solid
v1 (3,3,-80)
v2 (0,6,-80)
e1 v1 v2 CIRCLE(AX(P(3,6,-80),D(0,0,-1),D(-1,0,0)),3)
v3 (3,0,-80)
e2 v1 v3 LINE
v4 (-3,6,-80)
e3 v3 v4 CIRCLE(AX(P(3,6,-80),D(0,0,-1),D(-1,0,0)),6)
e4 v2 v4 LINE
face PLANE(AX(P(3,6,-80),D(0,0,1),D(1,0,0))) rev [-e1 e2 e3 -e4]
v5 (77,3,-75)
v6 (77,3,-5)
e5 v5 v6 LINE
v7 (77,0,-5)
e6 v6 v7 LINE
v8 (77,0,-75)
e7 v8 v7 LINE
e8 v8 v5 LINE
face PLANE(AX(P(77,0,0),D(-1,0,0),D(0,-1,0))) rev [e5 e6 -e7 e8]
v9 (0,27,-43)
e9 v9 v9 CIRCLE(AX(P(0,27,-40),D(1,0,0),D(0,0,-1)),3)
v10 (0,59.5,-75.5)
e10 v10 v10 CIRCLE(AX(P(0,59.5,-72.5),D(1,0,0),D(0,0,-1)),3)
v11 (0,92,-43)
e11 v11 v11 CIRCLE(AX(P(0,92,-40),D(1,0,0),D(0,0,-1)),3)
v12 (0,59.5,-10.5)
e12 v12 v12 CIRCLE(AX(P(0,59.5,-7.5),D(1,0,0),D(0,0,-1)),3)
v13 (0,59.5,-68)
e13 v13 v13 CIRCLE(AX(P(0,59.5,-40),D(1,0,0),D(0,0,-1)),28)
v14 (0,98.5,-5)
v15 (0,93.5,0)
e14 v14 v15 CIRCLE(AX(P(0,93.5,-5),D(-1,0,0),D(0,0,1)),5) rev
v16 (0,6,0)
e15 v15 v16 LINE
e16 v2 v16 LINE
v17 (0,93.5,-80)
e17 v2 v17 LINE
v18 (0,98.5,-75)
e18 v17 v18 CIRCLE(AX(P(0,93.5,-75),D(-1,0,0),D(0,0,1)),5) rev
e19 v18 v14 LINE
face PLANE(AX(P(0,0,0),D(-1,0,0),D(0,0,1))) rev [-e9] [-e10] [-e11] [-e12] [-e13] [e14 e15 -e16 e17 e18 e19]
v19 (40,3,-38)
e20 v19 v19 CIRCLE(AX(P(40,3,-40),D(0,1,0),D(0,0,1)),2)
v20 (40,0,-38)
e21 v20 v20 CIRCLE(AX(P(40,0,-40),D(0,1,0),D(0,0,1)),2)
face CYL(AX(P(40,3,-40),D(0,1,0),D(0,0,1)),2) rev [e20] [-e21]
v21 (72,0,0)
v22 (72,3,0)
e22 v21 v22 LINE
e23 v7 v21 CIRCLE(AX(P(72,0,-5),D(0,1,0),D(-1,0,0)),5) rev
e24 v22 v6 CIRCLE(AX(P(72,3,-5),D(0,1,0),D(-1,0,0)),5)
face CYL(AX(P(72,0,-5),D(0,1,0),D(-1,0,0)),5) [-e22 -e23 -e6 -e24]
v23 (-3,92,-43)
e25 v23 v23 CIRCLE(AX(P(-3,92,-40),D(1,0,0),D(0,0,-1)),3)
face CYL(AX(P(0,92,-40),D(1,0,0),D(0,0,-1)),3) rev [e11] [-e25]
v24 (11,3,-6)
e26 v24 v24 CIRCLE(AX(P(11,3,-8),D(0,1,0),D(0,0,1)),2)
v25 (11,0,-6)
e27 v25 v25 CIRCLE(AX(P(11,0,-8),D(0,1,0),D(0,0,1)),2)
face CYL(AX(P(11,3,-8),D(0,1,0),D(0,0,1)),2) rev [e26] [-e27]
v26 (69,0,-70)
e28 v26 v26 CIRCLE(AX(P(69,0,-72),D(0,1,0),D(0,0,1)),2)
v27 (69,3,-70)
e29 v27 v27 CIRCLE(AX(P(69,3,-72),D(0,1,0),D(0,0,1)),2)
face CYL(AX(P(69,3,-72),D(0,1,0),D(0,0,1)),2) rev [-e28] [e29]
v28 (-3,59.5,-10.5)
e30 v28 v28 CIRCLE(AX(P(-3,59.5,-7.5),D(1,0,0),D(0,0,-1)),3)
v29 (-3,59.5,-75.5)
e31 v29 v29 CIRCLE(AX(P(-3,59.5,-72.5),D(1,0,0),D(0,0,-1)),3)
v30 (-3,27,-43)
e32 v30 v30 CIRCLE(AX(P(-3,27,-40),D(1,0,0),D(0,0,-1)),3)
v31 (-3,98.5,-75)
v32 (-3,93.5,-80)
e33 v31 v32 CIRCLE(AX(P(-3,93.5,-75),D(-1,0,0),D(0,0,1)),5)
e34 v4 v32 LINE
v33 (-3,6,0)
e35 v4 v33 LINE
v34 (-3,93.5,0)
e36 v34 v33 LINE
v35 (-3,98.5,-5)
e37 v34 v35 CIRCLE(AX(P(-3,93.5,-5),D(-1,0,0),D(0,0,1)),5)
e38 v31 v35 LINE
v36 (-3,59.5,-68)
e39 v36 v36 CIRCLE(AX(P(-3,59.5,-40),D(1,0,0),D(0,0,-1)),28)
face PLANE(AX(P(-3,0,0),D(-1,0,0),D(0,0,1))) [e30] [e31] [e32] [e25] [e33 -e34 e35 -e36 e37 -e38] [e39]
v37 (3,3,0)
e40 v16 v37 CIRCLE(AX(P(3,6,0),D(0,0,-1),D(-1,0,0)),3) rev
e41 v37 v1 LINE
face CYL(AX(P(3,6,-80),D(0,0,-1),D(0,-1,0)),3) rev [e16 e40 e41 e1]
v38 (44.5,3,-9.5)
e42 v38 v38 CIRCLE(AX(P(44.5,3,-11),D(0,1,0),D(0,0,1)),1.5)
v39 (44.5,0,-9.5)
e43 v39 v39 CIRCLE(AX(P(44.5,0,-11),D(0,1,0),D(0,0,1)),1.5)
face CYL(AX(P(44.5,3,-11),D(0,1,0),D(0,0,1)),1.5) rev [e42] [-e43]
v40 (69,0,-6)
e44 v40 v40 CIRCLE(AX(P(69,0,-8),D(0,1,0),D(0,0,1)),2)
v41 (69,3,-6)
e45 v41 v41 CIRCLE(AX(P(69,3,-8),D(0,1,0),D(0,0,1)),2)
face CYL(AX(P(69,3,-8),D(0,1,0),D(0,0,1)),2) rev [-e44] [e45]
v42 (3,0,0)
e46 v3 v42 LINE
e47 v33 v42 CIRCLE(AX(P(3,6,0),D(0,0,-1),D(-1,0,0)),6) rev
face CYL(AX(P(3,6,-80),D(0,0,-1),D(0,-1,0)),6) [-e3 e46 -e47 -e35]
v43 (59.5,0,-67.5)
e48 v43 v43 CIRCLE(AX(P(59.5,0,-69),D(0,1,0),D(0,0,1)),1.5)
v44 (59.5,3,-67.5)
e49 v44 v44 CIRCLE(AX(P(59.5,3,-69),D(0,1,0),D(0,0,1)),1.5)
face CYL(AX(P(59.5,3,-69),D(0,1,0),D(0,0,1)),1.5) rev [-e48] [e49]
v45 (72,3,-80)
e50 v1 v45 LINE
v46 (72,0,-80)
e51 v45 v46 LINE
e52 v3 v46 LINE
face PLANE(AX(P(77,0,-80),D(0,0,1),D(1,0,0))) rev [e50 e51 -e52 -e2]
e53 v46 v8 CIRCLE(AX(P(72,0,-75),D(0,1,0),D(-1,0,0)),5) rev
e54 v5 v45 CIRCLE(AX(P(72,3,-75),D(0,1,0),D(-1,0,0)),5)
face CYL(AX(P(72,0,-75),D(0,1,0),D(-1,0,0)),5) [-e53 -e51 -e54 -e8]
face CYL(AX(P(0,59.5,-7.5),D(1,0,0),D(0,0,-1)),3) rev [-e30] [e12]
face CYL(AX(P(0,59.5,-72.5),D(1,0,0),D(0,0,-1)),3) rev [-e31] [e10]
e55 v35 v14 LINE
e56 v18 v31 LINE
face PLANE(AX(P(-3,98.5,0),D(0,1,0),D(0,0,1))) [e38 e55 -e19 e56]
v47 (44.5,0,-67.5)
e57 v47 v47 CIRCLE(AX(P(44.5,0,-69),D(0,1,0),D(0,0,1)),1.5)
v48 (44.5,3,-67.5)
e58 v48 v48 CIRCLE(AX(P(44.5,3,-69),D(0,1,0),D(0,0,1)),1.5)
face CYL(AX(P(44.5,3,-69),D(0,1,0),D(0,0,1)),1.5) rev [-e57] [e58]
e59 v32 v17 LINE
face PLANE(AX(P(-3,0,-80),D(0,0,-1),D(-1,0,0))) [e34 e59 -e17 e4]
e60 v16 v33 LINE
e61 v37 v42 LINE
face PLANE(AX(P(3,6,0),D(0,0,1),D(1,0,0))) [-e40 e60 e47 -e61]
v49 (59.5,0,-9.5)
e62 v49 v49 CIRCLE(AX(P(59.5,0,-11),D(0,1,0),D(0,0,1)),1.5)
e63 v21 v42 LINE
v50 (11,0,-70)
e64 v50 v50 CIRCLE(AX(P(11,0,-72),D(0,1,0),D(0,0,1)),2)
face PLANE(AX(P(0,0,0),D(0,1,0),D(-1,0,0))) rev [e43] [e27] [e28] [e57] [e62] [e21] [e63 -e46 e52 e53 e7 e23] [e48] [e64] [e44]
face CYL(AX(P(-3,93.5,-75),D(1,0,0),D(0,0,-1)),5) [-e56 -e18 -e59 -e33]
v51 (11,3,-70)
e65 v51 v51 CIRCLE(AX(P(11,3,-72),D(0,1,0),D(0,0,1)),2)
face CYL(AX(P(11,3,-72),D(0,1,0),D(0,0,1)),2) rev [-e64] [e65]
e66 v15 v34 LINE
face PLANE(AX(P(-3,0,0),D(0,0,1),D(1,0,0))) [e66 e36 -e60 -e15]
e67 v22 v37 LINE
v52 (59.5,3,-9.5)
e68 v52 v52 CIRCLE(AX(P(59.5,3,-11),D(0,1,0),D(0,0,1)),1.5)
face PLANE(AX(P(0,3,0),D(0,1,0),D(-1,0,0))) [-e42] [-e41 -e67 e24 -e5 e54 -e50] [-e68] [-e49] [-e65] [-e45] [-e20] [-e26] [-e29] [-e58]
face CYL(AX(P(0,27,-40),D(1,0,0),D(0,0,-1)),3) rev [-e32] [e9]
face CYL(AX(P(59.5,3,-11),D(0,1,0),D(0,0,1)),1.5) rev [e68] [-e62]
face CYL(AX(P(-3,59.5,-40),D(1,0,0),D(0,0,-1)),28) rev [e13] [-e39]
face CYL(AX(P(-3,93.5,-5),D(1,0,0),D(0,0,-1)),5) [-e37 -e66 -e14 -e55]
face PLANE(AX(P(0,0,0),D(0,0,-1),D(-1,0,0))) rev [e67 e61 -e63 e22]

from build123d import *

# Parameters (mm, degrees)
SKETCH1_W                        = 80
SKETCH1_H                        = 98.5
SKETCH1_R                        = 28
BASE_FLANGE1_DEPTH               = 3
F_6_0_6_DIAMETER_HOLE1_D         = 6
CIRPATTERN1_COUNT                = 4
SM_EDGE_FLANGE_1_STRIP_W         = 18
SM_EDGE_FLANGE_1_STRIP_H         = 3
SM_EDGE_FLANGE_1_STRIP_CUT_DEPTH = 80
SM_EDGE_FLANGE_1_DEPTH           = 80
FILLET1_R                        = 5
F_4_0_4_DIAMETER_HOLE4_D         = 4
F_3_0_3_DIAMETER_HOLE2_D         = 3


# Sheet-metal steps are written as plain solids
with BuildPart() as part:
    # Sketch1 → Base-Flange1 (new body)
    with BuildSketch(Plane(origin=(0, 0, 0), x_dir=(0, 0, -1), z_dir=(1, 0, 0))):
        with Locations((40, 49.25)):
            Rectangle(SKETCH1_W, SKETCH1_H)
        with Locations((40, 59.5)):
            Circle(SKETCH1_R, mode=Mode.SUBTRACT)
    extrude(amount=-BASE_FLANGE1_DEPTH)

    # Ø6.0 (6) Diameter Hole1 (through all)
    with Locations(Plane(origin=(0, 0, 0), x_dir=(0, 0, -1), z_dir=(1, 0, 0))):
        with Locations((40, 92)):
            f_6_0_6_diameter_hole1 = Hole(F_6_0_6_DIAMETER_HOLE1_D / 2)

    # CirPattern1: Ø6.0 (6) Diameter Hole1 ×4 about axis
    cirpattern1_axis = Axis((0, 59.5, -40), (1, 0, 0))
    for i in range(1, CIRPATTERN1_COUNT):
        add(f_6_0_6_diameter_hole1.rotate(cirpattern1_axis, i * 360 / CIRPATTERN1_COUNT), mode=Mode.SUBTRACT)

    # 邊線-凸緣1 strip (across the edge) → 邊線-凸緣1 strip cut (cut)
    with BuildSketch(Plane.YX):
        with Locations((-3, -1.5)):
            Rectangle(SM_EDGE_FLANGE_1_STRIP_W, SM_EDGE_FLANGE_1_STRIP_H)
    extrude(amount=SM_EDGE_FLANGE_1_STRIP_CUT_DEPTH, mode=Mode.SUBTRACT)

    # 邊線-凸緣1 section (across the edge) → 邊線-凸緣1 (add)
    with BuildSketch(Plane.YX):
        with BuildLine():
            Line((0, 3), (0, 77))
            Line((0, 77), (3, 77))
            Line((3, 77), (3, 3))
            ThreePointArc((3, 3), (3.878679656, 0.878679656), (6, 0))
            Line((6, 0), (6, -3))
            ThreePointArc((6, -3), (1.757359313, -1.242640687), (0, 3))
        make_face()
    extrude(amount=SM_EDGE_FLANGE_1_DEPTH)

    # Fillet1
    fillet1_edges = [part.edges().sort_by_distance(p)[0] for p in [
        (77, 1.5, 0),
        (77, 1.5, -80),
        (-1.5, 98.5, 0),
        (-1.5, 98.5, -80),
    ]]
    fillet(fillet1_edges, radius=FILLET1_R)

    # Ø4.0 (4) Diameter Hole4 (through all)
    with Locations(Plane(origin=(0, 3, 0), x_dir=(1, 0, 0), z_dir=(0, 1, 0))):
        with Locations((11, 8), (11, 72), (69, 72), (69, 8), (40, 40)):
            Hole(F_4_0_4_DIAMETER_HOLE4_D / 2)

    # Ø3.0 (3) Diameter Hole2 (through all)
    with Locations(Plane(origin=(0, 3, 0), x_dir=(1, 0, 0), z_dir=(0, 1, 0))):
        with Locations((44.5, 11), (59.5, 11)):
            f_3_0_3_diameter_hole2 = Hole(F_3_0_3_DIAMETER_HOLE2_D / 2)

    # Mirror1: Ø3.0 (3) Diameter Hole2 across plane
    add(f_3_0_3_diameter_hole2.mirror(Plane.XY.offset(-40)), mode=Mode.SUBTRACT)


solid = part.part
